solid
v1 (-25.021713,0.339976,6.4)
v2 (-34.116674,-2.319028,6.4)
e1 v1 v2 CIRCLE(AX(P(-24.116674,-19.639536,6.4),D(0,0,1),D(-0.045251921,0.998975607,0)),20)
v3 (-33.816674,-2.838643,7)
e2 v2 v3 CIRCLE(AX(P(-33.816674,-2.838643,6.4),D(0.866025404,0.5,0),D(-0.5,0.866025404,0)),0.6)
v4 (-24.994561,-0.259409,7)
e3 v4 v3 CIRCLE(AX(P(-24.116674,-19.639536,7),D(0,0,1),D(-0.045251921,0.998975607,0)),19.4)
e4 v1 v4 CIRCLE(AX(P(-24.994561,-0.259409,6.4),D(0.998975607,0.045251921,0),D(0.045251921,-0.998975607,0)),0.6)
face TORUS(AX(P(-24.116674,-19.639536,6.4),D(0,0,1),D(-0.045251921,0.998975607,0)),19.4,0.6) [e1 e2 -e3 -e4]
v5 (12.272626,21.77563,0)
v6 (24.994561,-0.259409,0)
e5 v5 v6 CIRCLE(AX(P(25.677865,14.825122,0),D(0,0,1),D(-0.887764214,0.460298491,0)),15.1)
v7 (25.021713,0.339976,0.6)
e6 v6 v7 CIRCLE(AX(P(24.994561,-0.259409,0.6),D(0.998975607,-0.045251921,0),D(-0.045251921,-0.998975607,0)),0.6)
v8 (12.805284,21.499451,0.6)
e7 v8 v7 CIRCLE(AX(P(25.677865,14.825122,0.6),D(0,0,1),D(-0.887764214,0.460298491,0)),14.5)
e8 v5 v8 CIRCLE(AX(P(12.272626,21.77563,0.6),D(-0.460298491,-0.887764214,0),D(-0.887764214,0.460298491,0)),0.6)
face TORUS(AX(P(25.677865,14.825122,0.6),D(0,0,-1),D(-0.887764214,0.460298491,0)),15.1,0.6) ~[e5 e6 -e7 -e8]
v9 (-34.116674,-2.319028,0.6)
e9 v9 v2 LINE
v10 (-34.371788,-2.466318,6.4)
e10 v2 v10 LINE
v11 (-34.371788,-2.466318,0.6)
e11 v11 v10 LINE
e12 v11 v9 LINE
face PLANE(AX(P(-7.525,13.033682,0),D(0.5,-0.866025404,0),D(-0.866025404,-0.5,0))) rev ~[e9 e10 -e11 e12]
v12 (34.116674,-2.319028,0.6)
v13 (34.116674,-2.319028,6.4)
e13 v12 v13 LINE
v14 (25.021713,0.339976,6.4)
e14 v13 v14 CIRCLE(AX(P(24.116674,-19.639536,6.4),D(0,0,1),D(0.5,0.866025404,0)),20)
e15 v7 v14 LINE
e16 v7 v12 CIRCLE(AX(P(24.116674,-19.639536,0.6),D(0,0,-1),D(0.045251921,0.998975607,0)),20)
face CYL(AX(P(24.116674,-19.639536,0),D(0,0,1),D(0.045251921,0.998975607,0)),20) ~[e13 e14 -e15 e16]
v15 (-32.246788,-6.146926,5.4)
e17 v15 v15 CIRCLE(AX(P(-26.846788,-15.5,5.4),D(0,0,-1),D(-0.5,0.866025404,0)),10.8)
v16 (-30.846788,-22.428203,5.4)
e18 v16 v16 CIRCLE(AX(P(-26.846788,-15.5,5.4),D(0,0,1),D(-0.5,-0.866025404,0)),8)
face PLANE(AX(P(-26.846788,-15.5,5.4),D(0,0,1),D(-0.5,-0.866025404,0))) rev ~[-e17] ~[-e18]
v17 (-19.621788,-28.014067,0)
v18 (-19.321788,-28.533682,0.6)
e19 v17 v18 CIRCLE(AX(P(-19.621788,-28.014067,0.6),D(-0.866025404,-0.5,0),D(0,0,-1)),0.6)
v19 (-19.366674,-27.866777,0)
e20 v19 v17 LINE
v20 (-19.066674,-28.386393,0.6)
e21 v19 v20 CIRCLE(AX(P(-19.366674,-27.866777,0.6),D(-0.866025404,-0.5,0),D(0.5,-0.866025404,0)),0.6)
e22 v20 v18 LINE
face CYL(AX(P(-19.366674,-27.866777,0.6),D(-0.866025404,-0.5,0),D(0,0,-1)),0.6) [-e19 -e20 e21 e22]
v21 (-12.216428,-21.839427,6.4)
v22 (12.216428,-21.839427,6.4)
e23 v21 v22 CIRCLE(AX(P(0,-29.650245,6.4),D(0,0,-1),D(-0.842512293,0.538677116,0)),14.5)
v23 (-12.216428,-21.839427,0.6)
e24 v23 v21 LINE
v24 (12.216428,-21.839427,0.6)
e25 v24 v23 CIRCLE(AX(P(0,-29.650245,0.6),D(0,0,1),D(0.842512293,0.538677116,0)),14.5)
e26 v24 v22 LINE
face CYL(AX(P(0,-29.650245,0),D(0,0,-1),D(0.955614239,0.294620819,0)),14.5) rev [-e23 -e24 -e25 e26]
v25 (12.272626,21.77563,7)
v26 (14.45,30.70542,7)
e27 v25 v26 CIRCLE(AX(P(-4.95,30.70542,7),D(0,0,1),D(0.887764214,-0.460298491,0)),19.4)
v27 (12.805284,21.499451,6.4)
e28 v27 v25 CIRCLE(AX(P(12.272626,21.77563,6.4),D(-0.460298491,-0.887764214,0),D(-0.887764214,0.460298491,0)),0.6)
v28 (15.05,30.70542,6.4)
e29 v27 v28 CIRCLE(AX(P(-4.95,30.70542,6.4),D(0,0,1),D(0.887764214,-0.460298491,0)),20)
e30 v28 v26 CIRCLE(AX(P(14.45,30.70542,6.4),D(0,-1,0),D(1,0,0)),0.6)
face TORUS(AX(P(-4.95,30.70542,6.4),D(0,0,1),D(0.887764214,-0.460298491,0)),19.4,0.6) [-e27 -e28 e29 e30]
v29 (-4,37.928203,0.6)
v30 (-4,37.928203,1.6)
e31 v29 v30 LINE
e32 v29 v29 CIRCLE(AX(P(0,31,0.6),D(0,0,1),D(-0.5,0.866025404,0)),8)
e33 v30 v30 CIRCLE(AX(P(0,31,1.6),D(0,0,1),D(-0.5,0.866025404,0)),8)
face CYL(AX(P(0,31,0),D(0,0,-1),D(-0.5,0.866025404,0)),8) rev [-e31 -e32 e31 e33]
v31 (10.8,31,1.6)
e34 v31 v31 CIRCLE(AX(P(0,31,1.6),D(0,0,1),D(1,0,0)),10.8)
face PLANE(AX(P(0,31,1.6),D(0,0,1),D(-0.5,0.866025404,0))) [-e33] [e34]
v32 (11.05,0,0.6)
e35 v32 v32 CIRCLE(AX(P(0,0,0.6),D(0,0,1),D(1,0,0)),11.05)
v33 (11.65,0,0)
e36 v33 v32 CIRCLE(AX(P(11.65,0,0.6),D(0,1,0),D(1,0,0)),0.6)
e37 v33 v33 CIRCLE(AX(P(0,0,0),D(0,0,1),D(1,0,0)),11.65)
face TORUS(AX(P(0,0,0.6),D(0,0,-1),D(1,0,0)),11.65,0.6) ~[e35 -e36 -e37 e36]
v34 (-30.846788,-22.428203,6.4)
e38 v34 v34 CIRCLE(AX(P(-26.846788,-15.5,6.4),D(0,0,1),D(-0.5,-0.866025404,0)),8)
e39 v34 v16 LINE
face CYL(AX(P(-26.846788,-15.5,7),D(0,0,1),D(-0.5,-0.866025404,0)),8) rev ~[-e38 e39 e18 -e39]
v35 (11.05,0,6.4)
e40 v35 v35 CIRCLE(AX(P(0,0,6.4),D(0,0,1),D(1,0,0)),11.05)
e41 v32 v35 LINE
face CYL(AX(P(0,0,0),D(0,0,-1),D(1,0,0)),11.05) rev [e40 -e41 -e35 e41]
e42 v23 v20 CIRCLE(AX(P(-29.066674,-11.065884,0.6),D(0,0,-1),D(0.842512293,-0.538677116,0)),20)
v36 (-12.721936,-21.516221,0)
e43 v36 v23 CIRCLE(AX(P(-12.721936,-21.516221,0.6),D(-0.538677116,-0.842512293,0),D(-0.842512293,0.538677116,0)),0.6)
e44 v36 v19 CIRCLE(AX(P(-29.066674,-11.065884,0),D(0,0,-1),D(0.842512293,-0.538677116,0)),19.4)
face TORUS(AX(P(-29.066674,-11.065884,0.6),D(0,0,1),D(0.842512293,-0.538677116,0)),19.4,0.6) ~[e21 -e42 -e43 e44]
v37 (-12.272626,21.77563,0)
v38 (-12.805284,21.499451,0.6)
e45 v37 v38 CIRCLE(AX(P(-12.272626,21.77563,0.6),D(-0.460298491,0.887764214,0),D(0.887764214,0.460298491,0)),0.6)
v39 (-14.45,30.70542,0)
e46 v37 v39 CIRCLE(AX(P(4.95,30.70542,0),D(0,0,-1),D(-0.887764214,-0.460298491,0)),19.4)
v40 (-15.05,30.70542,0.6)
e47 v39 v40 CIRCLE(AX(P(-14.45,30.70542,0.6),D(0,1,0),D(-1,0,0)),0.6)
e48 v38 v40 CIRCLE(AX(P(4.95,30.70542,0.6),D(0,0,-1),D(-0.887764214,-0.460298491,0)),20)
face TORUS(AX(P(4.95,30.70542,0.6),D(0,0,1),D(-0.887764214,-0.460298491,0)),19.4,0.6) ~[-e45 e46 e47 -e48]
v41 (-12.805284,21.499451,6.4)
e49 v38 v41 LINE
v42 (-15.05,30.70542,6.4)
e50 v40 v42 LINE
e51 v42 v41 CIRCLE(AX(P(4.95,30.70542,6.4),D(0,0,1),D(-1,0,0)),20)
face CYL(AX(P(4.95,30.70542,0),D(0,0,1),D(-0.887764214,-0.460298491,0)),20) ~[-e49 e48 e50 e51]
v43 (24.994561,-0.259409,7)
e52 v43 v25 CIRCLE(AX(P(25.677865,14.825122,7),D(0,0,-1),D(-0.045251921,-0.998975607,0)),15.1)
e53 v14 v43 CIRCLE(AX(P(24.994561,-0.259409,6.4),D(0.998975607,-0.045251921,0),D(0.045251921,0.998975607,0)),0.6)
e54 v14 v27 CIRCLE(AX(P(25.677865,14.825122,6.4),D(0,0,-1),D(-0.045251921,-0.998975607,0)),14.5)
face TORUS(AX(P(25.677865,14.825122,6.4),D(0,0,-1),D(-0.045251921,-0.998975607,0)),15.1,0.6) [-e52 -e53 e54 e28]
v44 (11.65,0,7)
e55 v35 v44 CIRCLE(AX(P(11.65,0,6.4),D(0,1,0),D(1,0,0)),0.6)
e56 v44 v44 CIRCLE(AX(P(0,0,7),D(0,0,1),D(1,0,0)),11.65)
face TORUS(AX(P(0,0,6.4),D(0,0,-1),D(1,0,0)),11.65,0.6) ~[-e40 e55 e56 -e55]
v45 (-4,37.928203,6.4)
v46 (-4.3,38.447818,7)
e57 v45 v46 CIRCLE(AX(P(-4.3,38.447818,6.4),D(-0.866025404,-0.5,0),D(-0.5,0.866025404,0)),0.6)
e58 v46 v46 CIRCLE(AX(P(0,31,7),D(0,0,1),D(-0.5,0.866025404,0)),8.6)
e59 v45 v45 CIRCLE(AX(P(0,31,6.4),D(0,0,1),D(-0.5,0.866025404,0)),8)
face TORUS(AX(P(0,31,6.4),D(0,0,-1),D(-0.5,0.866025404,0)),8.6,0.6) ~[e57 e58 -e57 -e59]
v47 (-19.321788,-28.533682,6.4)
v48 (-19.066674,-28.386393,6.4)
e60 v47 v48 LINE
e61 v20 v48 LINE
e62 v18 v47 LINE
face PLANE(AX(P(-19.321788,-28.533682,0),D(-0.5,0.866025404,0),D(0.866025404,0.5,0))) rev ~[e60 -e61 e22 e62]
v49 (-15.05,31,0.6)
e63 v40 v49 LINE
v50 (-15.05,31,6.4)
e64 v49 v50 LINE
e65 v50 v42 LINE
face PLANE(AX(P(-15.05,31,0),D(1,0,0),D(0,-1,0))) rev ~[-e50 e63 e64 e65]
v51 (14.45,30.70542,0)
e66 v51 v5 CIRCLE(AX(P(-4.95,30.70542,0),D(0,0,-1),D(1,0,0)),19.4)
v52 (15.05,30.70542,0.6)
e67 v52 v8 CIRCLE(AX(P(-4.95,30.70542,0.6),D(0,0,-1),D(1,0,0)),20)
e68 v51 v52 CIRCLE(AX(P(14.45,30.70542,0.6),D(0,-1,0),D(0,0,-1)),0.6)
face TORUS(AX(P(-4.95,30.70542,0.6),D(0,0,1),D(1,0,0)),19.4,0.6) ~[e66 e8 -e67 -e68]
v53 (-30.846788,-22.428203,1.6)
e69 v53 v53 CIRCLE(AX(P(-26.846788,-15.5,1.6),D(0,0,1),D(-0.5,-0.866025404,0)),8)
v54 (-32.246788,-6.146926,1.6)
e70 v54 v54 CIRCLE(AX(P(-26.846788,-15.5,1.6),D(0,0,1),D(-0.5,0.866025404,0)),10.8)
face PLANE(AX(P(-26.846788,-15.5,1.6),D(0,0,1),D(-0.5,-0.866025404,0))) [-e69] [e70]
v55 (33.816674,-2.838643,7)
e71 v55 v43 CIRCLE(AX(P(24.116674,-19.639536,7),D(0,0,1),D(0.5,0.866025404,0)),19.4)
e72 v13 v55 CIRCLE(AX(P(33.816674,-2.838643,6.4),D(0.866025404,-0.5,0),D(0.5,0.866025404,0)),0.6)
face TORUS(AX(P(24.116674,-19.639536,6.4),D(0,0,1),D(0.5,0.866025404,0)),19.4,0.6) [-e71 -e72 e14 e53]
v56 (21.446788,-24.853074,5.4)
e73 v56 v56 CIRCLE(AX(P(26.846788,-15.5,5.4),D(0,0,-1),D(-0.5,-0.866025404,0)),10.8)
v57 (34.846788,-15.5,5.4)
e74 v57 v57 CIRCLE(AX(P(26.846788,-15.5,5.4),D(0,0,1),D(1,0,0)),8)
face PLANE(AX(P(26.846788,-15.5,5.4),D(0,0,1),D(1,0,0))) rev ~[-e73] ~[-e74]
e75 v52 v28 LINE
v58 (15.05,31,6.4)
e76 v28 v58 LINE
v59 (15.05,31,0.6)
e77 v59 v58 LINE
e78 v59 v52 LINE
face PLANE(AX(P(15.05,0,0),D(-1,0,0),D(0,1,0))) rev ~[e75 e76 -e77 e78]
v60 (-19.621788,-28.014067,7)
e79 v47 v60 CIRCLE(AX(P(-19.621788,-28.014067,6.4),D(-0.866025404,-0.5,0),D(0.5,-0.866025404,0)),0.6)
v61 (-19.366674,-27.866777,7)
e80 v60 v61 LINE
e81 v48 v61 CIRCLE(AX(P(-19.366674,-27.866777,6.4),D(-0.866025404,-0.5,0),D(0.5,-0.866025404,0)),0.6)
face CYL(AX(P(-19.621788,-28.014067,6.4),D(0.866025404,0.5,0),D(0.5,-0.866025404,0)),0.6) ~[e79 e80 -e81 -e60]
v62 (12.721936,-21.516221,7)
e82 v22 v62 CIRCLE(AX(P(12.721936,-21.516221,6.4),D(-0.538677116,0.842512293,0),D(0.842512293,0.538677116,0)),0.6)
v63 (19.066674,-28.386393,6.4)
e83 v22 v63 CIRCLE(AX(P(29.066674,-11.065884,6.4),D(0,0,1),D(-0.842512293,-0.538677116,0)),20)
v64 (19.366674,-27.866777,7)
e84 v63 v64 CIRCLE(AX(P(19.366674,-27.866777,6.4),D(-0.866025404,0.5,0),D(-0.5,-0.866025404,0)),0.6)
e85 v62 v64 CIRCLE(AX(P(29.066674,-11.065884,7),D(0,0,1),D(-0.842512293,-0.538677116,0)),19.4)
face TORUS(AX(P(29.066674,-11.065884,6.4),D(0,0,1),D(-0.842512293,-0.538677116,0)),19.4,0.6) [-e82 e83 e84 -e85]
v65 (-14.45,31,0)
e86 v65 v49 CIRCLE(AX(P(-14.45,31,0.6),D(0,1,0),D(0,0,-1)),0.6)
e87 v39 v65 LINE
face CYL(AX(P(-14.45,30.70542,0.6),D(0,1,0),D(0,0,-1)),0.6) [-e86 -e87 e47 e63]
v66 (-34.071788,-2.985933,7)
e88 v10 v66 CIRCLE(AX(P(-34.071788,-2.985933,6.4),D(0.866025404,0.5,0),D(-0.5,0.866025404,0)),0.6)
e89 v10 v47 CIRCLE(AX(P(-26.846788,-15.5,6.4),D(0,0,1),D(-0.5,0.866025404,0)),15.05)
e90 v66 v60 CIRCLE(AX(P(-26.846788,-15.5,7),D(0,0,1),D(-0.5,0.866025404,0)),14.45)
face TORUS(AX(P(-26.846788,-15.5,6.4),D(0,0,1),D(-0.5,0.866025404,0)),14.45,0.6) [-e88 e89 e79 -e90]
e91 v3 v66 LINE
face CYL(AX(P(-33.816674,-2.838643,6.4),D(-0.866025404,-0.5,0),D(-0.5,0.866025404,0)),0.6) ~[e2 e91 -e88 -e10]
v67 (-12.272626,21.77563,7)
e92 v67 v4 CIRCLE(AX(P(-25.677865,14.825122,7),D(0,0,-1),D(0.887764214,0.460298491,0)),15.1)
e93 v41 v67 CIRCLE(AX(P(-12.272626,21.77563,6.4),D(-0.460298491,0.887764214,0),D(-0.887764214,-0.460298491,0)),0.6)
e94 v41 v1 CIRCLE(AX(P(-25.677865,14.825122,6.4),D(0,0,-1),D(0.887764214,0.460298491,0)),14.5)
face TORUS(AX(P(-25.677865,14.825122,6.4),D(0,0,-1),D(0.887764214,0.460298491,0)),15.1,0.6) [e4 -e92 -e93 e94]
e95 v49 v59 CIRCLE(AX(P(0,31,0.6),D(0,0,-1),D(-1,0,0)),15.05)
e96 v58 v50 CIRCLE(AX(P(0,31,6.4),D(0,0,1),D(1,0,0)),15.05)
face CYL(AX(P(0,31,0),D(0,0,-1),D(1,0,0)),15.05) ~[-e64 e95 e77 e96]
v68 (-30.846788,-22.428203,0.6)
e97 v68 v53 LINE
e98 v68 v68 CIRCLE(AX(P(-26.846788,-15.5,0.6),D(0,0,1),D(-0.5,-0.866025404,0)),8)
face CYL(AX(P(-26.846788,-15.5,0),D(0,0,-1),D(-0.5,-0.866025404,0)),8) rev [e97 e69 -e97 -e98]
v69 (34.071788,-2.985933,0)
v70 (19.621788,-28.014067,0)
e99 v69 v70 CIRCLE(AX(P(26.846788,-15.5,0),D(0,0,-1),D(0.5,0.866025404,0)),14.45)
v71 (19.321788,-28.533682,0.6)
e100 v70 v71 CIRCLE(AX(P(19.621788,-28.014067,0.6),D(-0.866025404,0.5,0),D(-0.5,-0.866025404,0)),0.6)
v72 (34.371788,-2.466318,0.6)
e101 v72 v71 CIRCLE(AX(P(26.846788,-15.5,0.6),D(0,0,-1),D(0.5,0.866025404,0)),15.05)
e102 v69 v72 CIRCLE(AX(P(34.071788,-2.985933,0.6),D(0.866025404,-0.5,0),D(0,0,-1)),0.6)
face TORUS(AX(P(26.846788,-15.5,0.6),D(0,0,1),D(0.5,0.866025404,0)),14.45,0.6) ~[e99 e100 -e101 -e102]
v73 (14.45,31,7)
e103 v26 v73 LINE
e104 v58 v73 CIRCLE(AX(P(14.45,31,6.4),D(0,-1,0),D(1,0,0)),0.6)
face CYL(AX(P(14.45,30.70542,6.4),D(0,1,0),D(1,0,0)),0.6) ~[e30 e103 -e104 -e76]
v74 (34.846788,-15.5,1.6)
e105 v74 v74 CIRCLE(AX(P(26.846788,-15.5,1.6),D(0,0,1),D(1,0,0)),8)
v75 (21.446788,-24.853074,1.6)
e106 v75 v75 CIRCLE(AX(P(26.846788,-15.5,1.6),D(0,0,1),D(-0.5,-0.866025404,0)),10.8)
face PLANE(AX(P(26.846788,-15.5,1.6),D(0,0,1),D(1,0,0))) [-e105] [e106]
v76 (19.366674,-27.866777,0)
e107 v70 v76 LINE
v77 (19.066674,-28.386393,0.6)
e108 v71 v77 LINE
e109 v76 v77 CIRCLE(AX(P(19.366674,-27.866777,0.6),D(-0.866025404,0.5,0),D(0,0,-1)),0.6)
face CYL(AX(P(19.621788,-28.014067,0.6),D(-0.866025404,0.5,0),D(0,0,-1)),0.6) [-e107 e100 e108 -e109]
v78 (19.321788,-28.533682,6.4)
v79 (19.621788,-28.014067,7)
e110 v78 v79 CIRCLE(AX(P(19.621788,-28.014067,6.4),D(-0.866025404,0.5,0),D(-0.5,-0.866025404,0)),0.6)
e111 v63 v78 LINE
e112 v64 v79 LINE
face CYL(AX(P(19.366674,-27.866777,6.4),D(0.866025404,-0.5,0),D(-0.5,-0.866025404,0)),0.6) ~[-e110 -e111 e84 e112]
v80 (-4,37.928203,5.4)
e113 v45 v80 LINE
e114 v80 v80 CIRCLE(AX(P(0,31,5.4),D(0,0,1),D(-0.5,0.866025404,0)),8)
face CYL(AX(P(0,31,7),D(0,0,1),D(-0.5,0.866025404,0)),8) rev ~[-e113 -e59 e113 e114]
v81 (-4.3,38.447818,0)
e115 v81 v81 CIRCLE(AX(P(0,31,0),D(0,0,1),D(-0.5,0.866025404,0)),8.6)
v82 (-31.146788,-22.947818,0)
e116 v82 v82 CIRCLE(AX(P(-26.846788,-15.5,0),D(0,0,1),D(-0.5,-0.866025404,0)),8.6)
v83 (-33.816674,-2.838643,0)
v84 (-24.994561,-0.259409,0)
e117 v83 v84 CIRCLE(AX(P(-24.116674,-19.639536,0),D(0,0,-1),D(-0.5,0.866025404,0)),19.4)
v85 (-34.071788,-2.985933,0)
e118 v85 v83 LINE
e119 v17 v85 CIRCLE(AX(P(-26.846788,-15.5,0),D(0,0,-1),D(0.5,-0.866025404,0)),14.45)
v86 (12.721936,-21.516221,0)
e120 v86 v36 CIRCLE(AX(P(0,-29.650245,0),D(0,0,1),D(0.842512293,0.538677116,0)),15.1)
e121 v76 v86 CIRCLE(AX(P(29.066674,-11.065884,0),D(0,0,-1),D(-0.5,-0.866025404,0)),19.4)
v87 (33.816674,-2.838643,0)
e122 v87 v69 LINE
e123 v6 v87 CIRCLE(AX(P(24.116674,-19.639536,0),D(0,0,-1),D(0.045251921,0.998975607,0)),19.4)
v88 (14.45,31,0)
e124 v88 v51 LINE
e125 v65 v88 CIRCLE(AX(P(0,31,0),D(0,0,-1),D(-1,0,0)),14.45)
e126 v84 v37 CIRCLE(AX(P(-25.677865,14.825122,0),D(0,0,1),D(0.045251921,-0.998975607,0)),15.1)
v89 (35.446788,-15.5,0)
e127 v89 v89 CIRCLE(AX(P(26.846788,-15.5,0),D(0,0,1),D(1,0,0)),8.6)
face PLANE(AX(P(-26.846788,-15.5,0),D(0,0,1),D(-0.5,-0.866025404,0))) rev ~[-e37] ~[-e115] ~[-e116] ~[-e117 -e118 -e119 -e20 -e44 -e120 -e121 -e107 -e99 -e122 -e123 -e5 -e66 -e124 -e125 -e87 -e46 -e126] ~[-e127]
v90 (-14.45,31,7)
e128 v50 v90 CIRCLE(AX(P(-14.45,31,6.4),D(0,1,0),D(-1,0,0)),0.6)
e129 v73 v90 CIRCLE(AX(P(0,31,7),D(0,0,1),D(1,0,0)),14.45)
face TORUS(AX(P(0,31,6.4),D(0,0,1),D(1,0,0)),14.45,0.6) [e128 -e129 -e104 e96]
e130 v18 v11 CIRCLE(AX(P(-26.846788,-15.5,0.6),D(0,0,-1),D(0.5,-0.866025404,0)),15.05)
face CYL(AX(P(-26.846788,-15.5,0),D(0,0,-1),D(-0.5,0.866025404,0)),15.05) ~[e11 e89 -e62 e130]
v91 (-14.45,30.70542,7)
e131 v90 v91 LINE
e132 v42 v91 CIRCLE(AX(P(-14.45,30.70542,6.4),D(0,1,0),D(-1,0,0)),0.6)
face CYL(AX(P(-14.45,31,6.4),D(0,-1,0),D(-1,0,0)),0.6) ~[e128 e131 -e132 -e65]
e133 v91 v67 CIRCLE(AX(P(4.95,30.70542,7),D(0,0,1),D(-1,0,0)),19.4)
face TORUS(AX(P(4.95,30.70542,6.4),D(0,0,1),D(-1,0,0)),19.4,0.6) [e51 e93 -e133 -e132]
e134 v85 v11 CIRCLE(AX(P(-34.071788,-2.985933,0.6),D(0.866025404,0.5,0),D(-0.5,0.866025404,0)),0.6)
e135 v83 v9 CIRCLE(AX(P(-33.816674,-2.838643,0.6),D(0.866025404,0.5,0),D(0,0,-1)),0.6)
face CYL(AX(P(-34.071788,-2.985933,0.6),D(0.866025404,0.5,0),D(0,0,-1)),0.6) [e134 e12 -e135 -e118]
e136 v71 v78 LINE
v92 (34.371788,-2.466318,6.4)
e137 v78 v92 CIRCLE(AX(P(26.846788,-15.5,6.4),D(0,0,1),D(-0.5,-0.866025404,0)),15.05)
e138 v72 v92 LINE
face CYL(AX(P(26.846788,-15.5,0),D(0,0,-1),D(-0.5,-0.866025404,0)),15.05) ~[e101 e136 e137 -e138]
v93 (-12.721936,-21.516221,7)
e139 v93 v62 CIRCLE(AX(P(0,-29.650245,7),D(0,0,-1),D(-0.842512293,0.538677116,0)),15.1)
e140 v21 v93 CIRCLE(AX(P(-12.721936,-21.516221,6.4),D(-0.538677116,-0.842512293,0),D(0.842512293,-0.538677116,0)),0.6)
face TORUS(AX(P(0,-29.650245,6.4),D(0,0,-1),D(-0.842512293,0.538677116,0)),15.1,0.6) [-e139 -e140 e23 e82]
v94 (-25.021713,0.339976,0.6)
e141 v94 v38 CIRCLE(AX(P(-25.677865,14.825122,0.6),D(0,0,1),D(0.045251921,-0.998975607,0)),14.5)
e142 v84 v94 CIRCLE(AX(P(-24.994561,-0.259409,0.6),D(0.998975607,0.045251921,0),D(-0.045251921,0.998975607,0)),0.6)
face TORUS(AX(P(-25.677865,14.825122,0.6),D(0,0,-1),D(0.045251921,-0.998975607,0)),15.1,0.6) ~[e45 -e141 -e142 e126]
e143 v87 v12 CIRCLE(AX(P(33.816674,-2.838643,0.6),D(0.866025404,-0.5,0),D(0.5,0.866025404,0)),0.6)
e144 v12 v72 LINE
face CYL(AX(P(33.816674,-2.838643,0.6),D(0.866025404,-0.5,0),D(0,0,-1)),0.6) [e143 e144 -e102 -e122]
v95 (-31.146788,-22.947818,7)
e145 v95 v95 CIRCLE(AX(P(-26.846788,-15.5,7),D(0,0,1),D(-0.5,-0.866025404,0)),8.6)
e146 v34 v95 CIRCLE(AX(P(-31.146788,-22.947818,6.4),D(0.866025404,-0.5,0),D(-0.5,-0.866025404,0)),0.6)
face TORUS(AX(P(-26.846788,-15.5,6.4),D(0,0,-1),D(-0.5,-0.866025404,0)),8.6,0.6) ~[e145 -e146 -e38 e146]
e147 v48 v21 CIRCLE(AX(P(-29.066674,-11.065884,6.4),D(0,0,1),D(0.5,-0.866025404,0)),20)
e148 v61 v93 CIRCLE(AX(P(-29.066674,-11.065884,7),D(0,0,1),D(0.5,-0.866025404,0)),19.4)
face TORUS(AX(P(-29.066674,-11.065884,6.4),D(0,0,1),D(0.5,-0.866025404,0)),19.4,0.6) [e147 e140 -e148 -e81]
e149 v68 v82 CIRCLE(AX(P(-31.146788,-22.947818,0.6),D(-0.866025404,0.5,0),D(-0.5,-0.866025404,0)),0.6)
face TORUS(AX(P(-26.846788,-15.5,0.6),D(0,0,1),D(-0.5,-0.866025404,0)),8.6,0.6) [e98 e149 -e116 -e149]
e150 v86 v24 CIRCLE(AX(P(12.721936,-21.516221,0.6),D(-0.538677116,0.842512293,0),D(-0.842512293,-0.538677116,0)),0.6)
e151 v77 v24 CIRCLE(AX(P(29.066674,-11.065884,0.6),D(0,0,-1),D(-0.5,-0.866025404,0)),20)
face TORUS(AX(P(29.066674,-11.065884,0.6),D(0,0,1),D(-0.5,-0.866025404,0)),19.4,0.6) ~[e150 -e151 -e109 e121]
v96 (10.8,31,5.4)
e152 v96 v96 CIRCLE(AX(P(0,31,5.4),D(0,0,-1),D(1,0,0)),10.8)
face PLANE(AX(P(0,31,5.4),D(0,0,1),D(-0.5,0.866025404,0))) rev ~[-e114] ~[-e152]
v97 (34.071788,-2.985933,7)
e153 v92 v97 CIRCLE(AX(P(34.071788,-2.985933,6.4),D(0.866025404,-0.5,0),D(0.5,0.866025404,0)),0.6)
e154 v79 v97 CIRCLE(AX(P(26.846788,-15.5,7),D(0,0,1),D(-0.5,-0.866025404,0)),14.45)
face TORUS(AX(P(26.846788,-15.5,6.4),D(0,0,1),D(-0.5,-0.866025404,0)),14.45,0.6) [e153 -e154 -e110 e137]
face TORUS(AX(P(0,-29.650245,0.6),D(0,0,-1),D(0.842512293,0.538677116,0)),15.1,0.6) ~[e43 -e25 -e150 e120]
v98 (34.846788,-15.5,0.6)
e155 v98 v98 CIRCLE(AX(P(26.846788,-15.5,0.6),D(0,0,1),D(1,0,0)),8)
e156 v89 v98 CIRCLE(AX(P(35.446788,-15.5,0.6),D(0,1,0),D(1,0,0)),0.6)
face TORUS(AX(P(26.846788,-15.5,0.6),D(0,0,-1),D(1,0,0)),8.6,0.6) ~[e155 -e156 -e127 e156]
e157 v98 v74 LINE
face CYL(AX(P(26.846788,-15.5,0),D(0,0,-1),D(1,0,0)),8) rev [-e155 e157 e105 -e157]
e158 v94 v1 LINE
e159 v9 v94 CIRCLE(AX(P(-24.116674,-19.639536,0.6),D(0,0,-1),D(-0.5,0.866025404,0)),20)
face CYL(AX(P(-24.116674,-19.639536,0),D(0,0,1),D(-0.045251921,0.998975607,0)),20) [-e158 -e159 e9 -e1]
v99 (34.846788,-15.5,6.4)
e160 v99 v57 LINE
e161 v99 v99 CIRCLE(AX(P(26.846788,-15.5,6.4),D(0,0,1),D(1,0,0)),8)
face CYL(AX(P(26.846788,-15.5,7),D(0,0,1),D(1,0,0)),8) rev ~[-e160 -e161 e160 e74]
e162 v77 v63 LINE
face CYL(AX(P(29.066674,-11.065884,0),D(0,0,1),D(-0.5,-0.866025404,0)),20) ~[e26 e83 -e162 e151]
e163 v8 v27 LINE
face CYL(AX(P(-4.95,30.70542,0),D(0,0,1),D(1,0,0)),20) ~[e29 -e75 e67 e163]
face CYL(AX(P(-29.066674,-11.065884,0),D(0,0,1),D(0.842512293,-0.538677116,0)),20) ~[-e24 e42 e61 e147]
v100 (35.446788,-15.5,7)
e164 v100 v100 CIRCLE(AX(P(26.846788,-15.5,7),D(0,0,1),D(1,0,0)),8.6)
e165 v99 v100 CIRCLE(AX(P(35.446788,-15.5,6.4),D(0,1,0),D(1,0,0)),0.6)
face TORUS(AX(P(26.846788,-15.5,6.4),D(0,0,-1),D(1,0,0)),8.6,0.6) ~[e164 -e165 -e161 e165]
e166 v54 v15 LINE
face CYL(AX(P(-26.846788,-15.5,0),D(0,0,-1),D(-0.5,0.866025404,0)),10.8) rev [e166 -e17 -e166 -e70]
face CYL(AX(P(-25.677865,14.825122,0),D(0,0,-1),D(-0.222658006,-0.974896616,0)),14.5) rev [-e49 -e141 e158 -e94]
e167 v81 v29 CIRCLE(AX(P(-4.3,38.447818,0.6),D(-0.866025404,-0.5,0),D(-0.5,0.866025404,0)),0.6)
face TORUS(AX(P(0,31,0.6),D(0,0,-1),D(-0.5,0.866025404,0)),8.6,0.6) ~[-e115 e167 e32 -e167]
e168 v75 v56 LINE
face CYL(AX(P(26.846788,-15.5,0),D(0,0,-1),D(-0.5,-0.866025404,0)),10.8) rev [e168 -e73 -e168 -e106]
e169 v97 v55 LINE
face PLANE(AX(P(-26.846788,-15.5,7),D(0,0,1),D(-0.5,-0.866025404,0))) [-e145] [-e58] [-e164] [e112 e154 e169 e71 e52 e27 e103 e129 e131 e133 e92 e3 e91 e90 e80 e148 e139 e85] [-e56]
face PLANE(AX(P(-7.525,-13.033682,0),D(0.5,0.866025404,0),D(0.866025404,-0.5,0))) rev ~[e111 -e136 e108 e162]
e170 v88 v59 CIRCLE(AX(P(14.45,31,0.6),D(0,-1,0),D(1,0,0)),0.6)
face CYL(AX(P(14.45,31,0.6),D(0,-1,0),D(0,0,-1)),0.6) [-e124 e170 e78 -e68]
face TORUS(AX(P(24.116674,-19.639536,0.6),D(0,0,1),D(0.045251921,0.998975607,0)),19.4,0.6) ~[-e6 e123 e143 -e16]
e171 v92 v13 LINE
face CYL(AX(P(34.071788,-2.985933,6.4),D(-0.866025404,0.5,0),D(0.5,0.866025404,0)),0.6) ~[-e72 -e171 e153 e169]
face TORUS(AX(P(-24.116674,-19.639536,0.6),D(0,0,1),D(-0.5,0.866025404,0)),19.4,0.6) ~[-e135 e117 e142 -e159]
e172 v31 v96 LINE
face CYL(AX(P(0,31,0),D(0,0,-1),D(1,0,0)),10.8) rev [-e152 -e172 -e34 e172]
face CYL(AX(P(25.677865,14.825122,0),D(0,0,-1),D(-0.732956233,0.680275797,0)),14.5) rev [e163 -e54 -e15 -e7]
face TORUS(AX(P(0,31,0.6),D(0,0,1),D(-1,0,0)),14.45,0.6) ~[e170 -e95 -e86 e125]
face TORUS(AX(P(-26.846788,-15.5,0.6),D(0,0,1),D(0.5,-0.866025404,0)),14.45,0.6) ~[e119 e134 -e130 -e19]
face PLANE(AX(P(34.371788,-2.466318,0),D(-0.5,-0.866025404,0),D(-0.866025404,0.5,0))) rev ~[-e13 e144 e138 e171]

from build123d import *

# Parameters (mm, degrees)
F0_R             = 15.05
F0_R_2           = 11.05
F1_DEPTH         = 7
F2_R             = 10.8
F3_DEPTH         = 7
F3_COPIES_COUNT  = 3
F5_DEPTH         = 118
F5_COPIES_COUNT  = 3
F6_R             = 20
F7_R             = 10.8
F7_R_2           = 8
F8_DEPTH         = 1.6
F8_COPIES_COUNT  = 3
F9_R             = 10.8
F9_R_2           = 8
F10_DEPTH        = 1.6
F10_COPIES_COUNT = 3
F11_R            = 0.6


# Not quite as in the source:
# - two fillets or chamfers of one size are made in one step
# - an extrude ends at something that could not be found from the text; its depth is read off the source's solid
# - a pattern or mirror of a feature is missing from the dataset's text; its kind, count and spacing are read off the source's solid


with BuildPart() as f1:
    # F0 (on Top) → F1 (new body)
    with BuildSketch(Plane.XY):
        Circle(F0_R)
        Circle(F0_R_2, mode=Mode.SUBTRACT)
    extrude(amount=F1_DEPTH)

    # F2 (on Top) → F3 (join, through all)
    with BuildSketch(Plane.XY):
        with BuildLine():
            Line((15.05, 0), (15.05, 31))
            ThreePointArc((15.05, 31), (0, 46.05), (-15.05, 31))
            Line((-15.05, 31), (-15.05, 0))
            ThreePointArc((-15.05, 0), (0, 15.05), (15.05, 0))
        make_face()
        with Locations((0, 31)):
            Circle(F2_R, mode=Mode.SUBTRACT)
    f3 = extrude(amount=F3_DEPTH)

    # F3_copies: F3 ×3 about axis
    f3_copies_axis = Axis((0, 0, 0), (0, 0, 1))
    for i in range(1, F3_COPIES_COUNT):
        add(f3.rotate(f3_copies_axis, i * 360 / F3_COPIES_COUNT))

    # F4 (on Top) → F5 (cut, through all)
    with BuildSketch(Plane.XY):
        with BuildLine():
            Line((15.05, 8.6891215513), (15.05, 24.6891215513))
            ThreePointArc((15.05, 24.6891215513), (13.1204970221, 7.5751224876), (28.9064064606, 0.6891215513))
            Line((28.9064064606, 0.6891215513), (15.05, 8.6891215513))
        make_face()
    f5 = extrude(amount=F5_DEPTH, mode=Mode.SUBTRACT)

    # F5_copies: F5 ×3 about axis
    f5_copies_axis = Axis((0, 0, 0), (0, 0, 1))
    for i in range(1, F5_COPIES_COUNT):
        add(f5.rotate(f5_copies_axis, i * 360 / F5_COPIES_COUNT), mode=Mode.SUBTRACT)

    # F6
    f6_edges = [f1.edges().sort_by_distance(p)[0] for p in [
        (15.05, 24.689122, 3.5),
        (28.906406, 0.689122, 3.5),
        (13.856406, -25.378243, 3.5),
        (-13.856406, -25.378243, 3.5),
        (-28.906406, 0.689122, 3.5),
        (-15.05, 24.689122, 3.5),
    ]]
    fillet(f6_edges, radius=F6_R)

    # F7 (on Top) → F8 (join)
    with BuildSketch(Plane.XY):
        with Locations((26.8467875173, -15.5)):
            Circle(F7_R)
        with Locations((26.8467875173, -15.5)):
            Circle(F7_R_2, mode=Mode.SUBTRACT)
    f8 = extrude(amount=F8_DEPTH)

    # F8_copies: F8 ×3 about axis
    f8_copies_axis = Axis((0, 0, 0), (0, 0, 1))
    for i in range(1, F8_COPIES_COUNT):
        add(f8.rotate(f8_copies_axis, i * 360 / F8_COPIES_COUNT))

    # F9 (on face) → F10 (join)
    with BuildSketch(Plane.XY.offset(7)):
        with Locations((26.8467875173, -15.5)):
            Circle(F9_R)
        with Locations((26.8467875173, -15.5)):
            Circle(F9_R_2, mode=Mode.SUBTRACT)
    f10 = extrude(amount=-F10_DEPTH)

    # F10_copies: F10 ×3 about axis
    f10_copies_axis = Axis((0, 0, 0), (0, 0, 1))
    for i in range(1, F10_COPIES_COUNT):
        add(f10.rotate(f10_copies_axis, i * 360 / F10_COPIES_COUNT))

    # F11
    f11_edges = [f1.edges().sort_by_distance(p)[0] for p in [
        (-11.05, 0, 7),
        (-11.05, 0, 0),
        (34.244231, -2.392673, 7),
        (29.728941, -0.443118, 7),
        (13.120497, 7.575122, 7),
        (14.480719, 25.967577, 7),
        (15.05, 30.85271, 7),
        (0, 46.05, 7),
        (-15.05, 30.85271, 7),
        (-14.480719, 25.967577, 7),
        (-13.120497, 7.575122, 7),
        (-29.728941, -0.443118, 7),
        (-34.244231, -2.392673, 7),
        (-39.88047, -23.025, 7),
        (-19.194231, -28.460037, 7),
        (-15.248222, -25.524459, 7),
        (0, -15.150245, 7),
        (15.248222, -25.524459, 7),
        (19.194231, -28.460037, 7),
        (39.88047, -23.025, 7),
        (18.846788, -15.5, 7),
        (4, 24.071797, 7),
        (-22.846788, -8.571797, 7),
        (-22.846788, -8.571797, 0),
        (13.120497, 7.575122, 0),
        (14.480719, 25.967577, 0),
        (15.05, 30.85271, 0),
        (0, 46.05, 0),
        (-15.05, 30.85271, 0),
        (-14.480719, 25.967577, 0),
        (-13.120497, 7.575122, 0),
        (-29.728941, -0.443118, 0),
        (-34.244231, -2.392673, 0),
        (-39.88047, -23.025, 0),
        (-19.194231, -28.460037, 0),
        (-15.248222, -25.524459, 0),
        (0, -15.150245, 0),
        (15.248222, -25.524459, 0),
        (19.194231, -28.460037, 0),
        (39.88047, -23.025, 0),
        (34.244231, -2.392673, 0),
        (29.728941, -0.443118, 0),
        (18.846788, -15.5, 0),
        (4, 24.071797, 0),
    ]]
    fillet(f11_edges, radius=F11_R)


solid = f1.part
